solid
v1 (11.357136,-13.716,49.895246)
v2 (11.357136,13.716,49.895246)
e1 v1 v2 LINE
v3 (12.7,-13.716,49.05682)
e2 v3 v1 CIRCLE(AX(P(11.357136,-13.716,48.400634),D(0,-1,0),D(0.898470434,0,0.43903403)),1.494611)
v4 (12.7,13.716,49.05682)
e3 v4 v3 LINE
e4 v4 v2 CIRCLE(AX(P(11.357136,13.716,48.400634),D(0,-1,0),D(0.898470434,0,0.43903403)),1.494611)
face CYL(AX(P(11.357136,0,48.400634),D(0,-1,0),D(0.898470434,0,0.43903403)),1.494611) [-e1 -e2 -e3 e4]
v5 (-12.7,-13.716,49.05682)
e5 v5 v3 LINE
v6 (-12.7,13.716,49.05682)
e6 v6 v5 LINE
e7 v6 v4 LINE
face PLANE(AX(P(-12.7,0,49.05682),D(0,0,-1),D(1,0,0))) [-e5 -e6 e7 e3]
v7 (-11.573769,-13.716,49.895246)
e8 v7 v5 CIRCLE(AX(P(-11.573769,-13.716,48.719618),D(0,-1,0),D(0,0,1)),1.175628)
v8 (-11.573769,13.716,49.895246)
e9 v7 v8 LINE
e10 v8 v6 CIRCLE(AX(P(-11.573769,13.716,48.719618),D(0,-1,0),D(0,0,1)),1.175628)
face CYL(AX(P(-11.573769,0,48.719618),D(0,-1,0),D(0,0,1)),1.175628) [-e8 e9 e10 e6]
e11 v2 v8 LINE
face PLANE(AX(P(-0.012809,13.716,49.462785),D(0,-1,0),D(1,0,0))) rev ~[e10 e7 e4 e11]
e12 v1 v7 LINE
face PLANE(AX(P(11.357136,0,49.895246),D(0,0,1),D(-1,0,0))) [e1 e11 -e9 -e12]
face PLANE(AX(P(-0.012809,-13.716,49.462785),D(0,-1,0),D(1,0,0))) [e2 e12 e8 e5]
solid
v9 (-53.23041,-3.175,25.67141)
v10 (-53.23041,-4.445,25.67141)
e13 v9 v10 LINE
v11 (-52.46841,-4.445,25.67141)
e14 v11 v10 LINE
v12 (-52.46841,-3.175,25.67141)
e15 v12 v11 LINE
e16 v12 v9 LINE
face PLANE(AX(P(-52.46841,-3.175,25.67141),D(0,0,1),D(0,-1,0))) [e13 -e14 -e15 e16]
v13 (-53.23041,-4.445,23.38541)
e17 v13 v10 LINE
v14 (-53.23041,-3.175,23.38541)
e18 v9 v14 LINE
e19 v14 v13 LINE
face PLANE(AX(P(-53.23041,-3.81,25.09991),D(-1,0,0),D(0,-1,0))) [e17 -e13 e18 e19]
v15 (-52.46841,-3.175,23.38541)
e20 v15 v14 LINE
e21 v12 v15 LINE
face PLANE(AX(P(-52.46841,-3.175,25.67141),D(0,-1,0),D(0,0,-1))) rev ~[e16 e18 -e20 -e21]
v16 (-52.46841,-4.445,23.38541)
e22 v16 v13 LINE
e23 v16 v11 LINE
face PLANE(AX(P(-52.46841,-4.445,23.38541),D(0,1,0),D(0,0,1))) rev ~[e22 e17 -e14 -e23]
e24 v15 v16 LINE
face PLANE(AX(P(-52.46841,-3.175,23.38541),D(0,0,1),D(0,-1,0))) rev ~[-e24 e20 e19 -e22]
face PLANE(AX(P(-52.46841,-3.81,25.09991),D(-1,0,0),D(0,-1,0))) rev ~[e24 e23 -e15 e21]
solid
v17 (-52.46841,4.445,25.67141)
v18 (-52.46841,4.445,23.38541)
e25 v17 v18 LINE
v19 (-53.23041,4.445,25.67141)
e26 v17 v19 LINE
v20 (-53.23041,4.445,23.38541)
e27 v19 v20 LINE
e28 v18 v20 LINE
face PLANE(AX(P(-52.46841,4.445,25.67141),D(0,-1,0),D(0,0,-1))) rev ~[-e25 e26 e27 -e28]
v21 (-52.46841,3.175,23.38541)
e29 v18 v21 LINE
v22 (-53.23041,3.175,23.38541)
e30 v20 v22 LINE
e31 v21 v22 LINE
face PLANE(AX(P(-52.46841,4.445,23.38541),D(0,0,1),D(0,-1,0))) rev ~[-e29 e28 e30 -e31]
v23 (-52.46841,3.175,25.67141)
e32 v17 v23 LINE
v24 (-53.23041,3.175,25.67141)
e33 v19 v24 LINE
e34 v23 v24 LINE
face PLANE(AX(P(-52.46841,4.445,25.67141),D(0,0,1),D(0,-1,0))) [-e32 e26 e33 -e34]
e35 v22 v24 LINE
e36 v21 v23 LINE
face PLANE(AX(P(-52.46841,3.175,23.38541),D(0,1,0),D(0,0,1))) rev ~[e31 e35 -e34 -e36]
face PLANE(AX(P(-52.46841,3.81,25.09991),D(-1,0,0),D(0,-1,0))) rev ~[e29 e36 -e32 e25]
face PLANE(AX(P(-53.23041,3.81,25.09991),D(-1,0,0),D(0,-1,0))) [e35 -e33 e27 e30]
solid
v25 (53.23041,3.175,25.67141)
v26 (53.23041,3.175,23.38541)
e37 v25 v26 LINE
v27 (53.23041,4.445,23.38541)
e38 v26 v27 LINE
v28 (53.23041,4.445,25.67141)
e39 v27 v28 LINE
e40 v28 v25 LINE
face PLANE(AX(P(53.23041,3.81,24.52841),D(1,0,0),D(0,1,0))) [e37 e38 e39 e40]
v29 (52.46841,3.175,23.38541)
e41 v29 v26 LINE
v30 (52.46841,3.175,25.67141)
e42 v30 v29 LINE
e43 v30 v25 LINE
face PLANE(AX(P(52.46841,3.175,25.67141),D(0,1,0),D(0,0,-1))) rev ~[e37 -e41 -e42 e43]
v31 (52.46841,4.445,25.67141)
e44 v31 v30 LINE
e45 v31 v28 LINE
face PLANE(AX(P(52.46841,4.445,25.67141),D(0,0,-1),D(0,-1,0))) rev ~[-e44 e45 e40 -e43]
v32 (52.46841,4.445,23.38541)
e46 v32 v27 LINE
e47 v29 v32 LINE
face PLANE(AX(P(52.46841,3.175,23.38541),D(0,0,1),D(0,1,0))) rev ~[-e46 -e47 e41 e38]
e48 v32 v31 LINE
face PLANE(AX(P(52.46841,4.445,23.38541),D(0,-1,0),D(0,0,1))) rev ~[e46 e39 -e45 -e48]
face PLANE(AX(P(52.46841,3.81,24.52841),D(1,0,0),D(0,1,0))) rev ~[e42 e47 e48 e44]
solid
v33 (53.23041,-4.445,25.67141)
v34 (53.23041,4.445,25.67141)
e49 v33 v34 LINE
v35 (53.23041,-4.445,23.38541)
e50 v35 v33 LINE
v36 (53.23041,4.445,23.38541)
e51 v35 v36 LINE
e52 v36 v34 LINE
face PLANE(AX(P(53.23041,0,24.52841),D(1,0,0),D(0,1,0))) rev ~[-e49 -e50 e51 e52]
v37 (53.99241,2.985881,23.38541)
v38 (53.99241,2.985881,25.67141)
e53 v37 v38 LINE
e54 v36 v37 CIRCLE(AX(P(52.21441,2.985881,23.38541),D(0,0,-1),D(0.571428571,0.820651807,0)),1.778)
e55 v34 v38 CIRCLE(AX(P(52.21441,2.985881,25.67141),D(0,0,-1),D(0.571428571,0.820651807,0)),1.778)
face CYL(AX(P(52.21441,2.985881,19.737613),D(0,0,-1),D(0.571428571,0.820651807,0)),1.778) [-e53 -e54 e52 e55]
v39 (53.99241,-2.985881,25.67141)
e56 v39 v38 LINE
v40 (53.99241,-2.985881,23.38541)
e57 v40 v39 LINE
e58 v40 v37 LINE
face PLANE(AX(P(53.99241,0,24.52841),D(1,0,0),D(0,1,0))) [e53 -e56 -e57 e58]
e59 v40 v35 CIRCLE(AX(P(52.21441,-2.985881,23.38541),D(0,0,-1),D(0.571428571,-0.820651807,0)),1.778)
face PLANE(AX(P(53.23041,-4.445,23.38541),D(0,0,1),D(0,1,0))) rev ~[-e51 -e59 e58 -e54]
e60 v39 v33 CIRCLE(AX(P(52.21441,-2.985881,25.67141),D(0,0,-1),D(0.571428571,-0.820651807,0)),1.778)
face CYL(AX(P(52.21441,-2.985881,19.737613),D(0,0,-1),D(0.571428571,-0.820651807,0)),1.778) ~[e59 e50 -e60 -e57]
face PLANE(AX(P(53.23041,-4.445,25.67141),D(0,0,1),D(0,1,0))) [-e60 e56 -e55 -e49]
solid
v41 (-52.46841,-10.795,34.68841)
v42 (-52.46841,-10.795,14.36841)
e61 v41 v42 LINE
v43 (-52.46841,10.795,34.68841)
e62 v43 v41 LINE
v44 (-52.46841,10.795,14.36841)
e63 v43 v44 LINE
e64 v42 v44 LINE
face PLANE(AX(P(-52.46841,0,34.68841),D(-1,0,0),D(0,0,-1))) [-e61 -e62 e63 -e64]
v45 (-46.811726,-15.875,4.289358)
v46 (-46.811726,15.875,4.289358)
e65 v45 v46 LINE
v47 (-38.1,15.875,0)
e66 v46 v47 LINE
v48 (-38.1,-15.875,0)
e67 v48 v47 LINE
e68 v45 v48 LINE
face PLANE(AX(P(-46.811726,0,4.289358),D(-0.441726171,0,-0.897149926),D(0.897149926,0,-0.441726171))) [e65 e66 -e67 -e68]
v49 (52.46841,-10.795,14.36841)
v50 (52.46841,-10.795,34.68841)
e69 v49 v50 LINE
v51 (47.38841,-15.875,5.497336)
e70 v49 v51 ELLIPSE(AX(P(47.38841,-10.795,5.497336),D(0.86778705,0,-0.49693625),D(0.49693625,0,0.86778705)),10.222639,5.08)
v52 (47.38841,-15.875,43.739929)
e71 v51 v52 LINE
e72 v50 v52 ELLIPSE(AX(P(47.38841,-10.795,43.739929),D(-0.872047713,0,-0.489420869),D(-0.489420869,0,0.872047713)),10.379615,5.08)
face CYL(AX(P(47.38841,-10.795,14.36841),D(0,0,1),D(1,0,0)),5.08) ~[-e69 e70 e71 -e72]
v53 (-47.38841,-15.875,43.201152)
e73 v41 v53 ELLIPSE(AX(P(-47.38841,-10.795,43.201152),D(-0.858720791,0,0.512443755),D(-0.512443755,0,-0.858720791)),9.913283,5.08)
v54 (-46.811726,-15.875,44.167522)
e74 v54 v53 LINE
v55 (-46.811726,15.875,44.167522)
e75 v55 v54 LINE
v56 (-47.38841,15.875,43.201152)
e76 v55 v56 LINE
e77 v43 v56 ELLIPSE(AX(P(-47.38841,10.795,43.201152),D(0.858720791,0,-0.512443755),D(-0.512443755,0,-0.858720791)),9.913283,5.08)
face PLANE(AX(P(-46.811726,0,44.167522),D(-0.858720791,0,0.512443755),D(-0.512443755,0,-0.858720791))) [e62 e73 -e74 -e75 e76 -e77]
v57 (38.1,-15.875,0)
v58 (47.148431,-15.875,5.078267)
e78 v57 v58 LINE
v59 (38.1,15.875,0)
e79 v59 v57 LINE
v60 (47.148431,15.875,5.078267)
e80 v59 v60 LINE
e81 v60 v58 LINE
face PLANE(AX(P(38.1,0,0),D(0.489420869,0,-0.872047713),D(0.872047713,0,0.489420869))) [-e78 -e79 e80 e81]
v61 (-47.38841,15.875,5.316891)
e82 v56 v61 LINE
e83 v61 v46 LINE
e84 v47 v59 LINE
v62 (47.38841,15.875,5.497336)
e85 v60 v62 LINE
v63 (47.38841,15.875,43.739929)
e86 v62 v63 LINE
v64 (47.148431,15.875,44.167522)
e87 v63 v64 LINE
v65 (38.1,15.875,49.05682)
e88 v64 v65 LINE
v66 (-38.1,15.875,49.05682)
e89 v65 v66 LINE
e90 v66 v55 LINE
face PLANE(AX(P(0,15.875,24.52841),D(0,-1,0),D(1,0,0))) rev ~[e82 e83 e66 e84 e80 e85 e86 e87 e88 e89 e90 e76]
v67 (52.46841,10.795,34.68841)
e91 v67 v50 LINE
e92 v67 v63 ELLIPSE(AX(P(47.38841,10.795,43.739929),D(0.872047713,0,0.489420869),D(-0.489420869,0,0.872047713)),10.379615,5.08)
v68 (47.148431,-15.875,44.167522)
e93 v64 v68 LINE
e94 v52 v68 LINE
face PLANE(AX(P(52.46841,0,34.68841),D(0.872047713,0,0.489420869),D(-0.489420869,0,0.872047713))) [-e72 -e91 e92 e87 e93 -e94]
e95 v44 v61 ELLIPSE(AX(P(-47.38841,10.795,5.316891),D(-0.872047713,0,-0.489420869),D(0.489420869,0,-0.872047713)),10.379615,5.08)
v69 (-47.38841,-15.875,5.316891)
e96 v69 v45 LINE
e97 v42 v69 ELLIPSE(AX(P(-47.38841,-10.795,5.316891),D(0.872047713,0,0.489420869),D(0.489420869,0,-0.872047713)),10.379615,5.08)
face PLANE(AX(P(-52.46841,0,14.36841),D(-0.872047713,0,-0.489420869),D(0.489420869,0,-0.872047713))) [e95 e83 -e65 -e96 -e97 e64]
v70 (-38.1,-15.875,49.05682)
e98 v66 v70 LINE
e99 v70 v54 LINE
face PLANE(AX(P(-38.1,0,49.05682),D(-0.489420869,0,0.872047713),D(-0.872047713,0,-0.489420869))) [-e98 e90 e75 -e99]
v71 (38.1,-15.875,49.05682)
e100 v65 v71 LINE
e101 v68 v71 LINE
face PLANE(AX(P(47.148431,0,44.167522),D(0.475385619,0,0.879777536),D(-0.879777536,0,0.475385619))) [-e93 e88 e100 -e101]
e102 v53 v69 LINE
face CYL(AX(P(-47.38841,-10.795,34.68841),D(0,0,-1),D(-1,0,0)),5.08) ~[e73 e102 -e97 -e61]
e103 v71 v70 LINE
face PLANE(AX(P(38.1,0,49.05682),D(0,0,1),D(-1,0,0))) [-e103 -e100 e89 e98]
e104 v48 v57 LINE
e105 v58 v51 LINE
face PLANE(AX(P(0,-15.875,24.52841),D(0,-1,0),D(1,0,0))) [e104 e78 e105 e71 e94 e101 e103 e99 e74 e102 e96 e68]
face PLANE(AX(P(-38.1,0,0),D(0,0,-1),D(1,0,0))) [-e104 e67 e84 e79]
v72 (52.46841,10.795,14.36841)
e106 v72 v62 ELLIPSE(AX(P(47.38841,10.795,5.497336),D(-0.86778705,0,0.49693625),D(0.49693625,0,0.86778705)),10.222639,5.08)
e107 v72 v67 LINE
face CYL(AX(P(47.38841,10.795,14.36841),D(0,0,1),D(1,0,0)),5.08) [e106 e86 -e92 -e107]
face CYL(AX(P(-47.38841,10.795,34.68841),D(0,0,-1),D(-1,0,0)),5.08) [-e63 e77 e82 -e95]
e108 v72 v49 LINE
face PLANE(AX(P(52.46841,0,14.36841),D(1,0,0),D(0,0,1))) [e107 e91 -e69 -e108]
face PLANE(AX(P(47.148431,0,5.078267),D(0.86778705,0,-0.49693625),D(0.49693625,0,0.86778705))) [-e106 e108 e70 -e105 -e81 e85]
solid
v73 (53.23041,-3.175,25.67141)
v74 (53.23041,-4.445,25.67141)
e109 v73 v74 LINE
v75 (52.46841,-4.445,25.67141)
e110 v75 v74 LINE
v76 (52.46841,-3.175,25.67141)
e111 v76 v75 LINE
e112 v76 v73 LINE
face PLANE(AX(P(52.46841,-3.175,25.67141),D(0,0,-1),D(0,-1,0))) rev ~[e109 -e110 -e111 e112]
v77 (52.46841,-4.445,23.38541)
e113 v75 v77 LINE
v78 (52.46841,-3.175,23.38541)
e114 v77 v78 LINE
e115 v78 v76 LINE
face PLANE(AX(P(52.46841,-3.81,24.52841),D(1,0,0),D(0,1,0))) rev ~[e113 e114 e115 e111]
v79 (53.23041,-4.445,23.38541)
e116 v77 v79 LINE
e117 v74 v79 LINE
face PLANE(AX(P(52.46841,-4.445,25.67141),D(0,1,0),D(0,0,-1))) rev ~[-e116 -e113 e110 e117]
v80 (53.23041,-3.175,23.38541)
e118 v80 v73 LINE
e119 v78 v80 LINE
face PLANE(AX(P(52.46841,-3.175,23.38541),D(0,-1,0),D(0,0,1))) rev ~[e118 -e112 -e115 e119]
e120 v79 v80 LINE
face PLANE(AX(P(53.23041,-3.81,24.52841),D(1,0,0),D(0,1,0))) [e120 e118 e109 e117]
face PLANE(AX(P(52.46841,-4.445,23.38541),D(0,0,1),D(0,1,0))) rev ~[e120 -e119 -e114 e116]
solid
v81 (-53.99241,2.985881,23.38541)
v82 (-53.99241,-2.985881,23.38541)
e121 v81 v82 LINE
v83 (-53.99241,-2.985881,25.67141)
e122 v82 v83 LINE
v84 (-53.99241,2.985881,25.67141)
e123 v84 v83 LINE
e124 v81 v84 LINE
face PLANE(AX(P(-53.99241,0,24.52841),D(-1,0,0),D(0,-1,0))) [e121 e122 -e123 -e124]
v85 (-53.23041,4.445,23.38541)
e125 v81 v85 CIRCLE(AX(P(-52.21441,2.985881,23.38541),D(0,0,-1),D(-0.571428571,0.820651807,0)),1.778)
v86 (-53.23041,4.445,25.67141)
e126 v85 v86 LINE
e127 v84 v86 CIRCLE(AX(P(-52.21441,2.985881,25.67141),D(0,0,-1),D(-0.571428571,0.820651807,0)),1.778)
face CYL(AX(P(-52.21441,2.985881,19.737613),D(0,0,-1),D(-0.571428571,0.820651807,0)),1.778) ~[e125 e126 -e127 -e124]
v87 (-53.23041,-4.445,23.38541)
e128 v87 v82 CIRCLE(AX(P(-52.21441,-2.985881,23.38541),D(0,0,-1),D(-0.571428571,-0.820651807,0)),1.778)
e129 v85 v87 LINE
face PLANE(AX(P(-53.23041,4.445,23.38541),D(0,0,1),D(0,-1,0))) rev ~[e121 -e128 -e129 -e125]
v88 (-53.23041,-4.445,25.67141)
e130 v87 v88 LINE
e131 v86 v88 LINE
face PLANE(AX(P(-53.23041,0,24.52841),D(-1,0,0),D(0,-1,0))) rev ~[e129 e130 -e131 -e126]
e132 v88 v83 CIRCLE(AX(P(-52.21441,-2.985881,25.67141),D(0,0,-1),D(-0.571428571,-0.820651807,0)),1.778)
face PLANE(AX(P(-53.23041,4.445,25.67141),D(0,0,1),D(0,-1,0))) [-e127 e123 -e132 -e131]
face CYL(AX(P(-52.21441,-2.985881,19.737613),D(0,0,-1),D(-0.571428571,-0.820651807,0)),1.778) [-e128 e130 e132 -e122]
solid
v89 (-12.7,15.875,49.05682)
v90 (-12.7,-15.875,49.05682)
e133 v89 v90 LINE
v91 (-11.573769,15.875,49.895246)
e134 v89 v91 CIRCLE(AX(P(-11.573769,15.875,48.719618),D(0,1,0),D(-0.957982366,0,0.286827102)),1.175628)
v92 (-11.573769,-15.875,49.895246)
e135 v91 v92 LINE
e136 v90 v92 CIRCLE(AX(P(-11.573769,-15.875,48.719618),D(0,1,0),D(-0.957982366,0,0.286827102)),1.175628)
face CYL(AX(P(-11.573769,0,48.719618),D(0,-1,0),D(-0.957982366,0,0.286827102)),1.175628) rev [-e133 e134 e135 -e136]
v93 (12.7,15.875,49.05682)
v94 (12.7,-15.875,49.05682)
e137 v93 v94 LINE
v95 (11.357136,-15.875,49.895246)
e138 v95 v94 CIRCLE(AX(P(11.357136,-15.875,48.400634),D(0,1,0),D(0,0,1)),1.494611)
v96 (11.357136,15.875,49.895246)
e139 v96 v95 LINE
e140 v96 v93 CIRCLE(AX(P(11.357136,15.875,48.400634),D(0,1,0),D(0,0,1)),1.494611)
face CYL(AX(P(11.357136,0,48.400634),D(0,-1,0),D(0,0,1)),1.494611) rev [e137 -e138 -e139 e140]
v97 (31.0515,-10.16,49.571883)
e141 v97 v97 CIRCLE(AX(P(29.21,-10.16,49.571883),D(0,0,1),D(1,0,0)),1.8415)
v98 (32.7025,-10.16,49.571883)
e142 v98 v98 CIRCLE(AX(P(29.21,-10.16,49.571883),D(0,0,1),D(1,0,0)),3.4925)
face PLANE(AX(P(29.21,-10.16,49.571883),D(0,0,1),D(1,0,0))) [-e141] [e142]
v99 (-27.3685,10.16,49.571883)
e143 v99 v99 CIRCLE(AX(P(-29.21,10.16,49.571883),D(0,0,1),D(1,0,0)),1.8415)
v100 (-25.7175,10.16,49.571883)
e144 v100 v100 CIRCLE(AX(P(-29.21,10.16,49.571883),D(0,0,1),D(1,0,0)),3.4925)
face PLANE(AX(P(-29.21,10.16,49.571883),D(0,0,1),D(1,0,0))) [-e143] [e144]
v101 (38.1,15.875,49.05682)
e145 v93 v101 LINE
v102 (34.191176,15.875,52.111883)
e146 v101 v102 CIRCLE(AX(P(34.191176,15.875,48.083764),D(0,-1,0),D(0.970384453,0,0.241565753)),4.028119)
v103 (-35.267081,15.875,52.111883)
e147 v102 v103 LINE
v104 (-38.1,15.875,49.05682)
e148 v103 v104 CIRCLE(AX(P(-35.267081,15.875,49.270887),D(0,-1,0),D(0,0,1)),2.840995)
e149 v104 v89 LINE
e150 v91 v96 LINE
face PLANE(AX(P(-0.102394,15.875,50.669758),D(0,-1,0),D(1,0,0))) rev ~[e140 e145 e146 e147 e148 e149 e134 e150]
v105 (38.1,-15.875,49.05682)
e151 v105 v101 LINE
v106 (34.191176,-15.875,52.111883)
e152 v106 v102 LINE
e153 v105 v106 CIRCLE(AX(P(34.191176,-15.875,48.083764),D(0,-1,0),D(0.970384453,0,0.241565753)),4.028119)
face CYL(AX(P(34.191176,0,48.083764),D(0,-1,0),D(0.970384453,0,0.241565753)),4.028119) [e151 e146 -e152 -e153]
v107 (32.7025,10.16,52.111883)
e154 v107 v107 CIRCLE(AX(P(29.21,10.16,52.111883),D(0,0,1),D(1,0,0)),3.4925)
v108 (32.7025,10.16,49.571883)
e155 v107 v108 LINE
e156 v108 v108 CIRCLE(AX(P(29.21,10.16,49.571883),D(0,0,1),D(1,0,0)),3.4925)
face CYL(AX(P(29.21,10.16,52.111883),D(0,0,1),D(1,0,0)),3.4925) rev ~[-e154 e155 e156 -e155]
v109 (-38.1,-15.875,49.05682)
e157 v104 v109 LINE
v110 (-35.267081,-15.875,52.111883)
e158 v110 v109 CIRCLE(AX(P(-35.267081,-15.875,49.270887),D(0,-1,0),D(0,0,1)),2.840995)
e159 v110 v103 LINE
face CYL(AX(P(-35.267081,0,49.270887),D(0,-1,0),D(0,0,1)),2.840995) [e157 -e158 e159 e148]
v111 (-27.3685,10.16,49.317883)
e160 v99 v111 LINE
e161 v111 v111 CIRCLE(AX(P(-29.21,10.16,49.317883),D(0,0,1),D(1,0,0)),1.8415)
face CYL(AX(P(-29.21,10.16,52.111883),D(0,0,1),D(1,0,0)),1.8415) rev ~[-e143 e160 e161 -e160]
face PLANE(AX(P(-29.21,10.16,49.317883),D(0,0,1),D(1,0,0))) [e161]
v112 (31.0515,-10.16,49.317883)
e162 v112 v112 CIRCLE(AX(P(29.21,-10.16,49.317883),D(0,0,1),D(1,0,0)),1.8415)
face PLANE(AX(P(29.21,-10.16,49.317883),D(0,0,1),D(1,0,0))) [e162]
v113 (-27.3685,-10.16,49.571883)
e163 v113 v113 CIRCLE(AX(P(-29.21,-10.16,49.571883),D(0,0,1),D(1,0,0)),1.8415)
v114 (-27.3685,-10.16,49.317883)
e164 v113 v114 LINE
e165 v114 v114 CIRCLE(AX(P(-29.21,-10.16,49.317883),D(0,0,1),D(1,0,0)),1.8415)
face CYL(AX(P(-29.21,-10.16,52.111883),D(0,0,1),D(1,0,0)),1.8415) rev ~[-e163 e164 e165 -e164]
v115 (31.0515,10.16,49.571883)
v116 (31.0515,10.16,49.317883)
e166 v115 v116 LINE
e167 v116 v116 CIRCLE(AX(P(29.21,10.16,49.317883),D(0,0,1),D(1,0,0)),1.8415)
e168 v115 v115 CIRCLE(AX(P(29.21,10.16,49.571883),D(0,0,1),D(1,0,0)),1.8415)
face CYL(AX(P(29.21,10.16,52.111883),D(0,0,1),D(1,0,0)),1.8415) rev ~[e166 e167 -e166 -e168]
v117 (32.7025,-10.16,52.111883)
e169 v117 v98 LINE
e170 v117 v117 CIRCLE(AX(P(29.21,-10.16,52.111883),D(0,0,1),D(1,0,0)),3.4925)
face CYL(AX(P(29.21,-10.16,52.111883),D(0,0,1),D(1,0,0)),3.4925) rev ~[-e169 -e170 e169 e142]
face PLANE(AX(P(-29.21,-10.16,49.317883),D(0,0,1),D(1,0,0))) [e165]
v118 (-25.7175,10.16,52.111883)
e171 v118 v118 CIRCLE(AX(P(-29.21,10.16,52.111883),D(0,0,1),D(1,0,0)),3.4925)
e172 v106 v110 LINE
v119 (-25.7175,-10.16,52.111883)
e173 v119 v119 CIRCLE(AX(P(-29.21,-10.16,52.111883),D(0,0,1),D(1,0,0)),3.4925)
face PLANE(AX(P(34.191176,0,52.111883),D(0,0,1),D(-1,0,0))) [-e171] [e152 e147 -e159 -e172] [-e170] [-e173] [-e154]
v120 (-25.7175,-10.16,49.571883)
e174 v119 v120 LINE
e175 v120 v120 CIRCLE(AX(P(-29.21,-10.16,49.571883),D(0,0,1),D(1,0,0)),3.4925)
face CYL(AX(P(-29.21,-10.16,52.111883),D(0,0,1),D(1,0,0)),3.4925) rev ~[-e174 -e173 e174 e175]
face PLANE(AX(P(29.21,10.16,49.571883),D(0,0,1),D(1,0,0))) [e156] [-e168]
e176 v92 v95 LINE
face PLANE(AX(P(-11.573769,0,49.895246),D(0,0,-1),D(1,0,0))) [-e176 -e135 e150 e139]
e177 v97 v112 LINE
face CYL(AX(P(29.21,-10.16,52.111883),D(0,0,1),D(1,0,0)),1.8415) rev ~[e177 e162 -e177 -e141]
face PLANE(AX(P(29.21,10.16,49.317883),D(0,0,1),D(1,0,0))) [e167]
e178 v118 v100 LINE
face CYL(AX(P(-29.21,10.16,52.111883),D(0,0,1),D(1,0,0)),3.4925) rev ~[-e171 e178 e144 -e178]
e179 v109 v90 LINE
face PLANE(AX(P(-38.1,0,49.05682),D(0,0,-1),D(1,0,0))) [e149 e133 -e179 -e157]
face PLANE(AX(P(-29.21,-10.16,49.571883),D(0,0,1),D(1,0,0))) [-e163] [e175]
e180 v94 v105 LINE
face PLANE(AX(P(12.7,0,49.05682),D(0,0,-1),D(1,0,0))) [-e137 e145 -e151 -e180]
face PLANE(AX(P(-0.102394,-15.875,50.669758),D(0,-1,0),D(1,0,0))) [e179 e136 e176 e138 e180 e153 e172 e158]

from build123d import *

# Parameters (mm, degrees)
F1_DEPTH       = 15.875
F2_DEPTH       = 15.875
F3_DEPTH       = 13.716
F4_R           = 3.4925
F4_R_2         = 1.8415
F5_DEPTH       = 2.54
F6_DEPTH       = 2.794
F7_W           = 1.27
F7_H           = 1.143
F8_DEPTH       = 0.762
F9_W           = 8.89
F9_H           = 2.286
F10_DEPTH      = 0.762
F11_R          = 5.08
F14_DEPTH      = 0.762
F15_W          = 8.89
F15_H          = 2.286
F16_DEPTH      = 0.762
F17_T1_DEPTH   = 9.5815945611
F17_2_T1_DEPTH = 9.5815945611


# Not quite as in the source:
# - a fillet or chamfer that OpenCascade refuses, or shapes differently, is made with other operations: its cross-section is extruded or revolved along the edge and cut away or added
# - a feature names something its author has since deleted; it is built from what else it names


with BuildPart() as f1:
    # F0 (on Front) → F1 (new body, symmetric)
    with BuildSketch(Plane.XZ):
        Polygon((-52.4684097937, 14.3684097937), (-38.1, 0), (0, 0), (38.1, 0), (52.4684097937, 14.3684097937), (52.4684097937, 34.6884097937), (38.1, 49.0568195874), (12.7, 49.0568195874), (-12.7, 49.0568195874), (-38.1, 49.0568195874), (-52.4684097937, 34.6884097937), align=None)
        Polygon((-46.8117259443, 4.2893581497), (-38.1, 0), (-52.4684097937, 14.3684097937), align=None)
        Polygon((-46.8117259443, 44.167522341), (-52.4684097937, 34.6884097937), (-38.1, 49.0568195874), align=None)
        Polygon((38.1, 49.0568195874), (52.4684097937, 34.6884097937), (47.1484308168, 44.167522341), align=None)
        Polygon((52.4684097937, 14.3684097937), (38.1, 0), (47.1484308168, 5.0782667132), align=None)
    extrude(amount=F1_DEPTH, both=True)

    # F11
    f11_edges = [f1.edges().sort_by_distance(p)[0] for p in [
        (-52.46841, -15.875, 24.52841),
        (-52.46841, 15.875, 24.52841),
        (52.46841, -15.875, 24.52841),
        (52.46841, 15.875, 24.52841),
    ]]
    fillet(f11_edges, radius=F11_R)


with BuildPart() as f2:
    # F0 (on Front) → F2 (new body, symmetric)
    with BuildSketch(Plane.XZ):
        with BuildLine():
            ThreePointArc((-35.2670811117, 52.1118827164), (-37.3502781829, 51.2026079726), (-38.1, 49.0568195874))
            Line((-38.1, 49.0568195874), (-12.7, 49.0568195874))
            ThreePointArc((-12.7, 49.0568195874), (-12.275793737, 49.6626248219), (-11.5737691522, 49.8952455819))
            Line((-11.5737691522, 49.8952455819), (11.3571360707, 49.8952455819))
            ThreePointArc((11.3571360707, 49.8952455819), (12.1486917669, 49.6684286067), (12.7, 49.0568195874))
            Line((12.7, 49.0568195874), (38.1, 49.0568195874))
            ThreePointArc((38.1, 49.0568195874), (36.6717162303, 51.25750972), (34.1911762953, 52.1118827164))
            Line((34.1911762953, 52.1118827164), (-35.2670811117, 52.1118827164))
        make_face()
    extrude(amount=F2_DEPTH, both=True)

    # F4 (on face) → F5 (cut)
    with BuildSketch(Plane.XY.offset(52.1118827164)):
        with Locations((29.21, -10.16)):
            Circle(F4_R)
        with Locations((29.21, -10.16)):
            Circle(F4_R_2, mode=Mode.SUBTRACT)
        with Locations((-29.21, -10.16)):
            Circle(F4_R)
        with Locations((-29.21, -10.16)):
            Circle(F4_R_2, mode=Mode.SUBTRACT)
        with Locations((-29.21, 10.16)):
            Circle(F4_R)
        with Locations((-29.21, 10.16)):
            Circle(F4_R_2, mode=Mode.SUBTRACT)
        with Locations((29.21, 10.16)):
            Circle(F4_R)
        with Locations((29.21, 10.16)):
            Circle(F4_R_2, mode=Mode.SUBTRACT)
    extrude(amount=-F5_DEPTH, mode=Mode.SUBTRACT)

    # F4 (on face) → F6 (cut)
    with BuildSketch(Plane.XY.offset(52.1118827164)):
        with Locations((-29.21, -10.16)):
            Circle(F4_R_2)
        with Locations((29.21, 10.16)):
            Circle(F4_R_2)
        with Locations((29.21, -10.16)):
            Circle(F4_R_2)
        with Locations((-29.21, 10.16)):
            Circle(F4_R_2)
    extrude(amount=-F6_DEPTH, mode=Mode.SUBTRACT)


with BuildPart() as f3:
    # F0 (on Front) → F3 (new body, symmetric)
    with BuildSketch(Plane.XZ):
        with BuildLine():
            ThreePointArc((-11.5737691522, 49.8952455819), (-12.275793737, 49.6626248219), (-12.7, 49.0568195874))
            Line((-12.7, 49.0568195874), (12.7, 49.0568195874))
            ThreePointArc((12.7, 49.0568195874), (12.1486917669, 49.6684286067), (11.3571360707, 49.8952455819))
            Line((11.3571360707, 49.8952455819), (-11.5737691522, 49.8952455819))
        make_face()
    extrude(amount=F3_DEPTH, both=True)


with BuildPart() as f8:
    # F7 (on face) → F8 (new body)
    with BuildSketch(Plane(origin=(-52.4684097937, 0, 0), x_dir=(0, -1, 0), z_dir=(-1, 0, 0))):
        with Locations((-3.81, 25.0999097937)):
            Rectangle(F7_W, F7_H)
        with Locations((-3.81, 23.9569097937)):
            Rectangle(F7_W, F7_H)
    extrude(amount=F8_DEPTH)


with BuildPart() as f8b:
    # F7 (on face) → F8, piece 2 (new body)
    with BuildSketch(Plane(origin=(-52.4684097937, 0, 0), x_dir=(0, -1, 0), z_dir=(-1, 0, 0))):
        with Locations((3.81, 25.0999097937)):
            Rectangle(F7_W, F7_H)
        with Locations((3.81, 23.9569097937)):
            Rectangle(F7_W, F7_H)
    extrude(amount=F8_DEPTH)


with BuildPart() as f10:
    # F9 (on face) → F10 (new body)
    with BuildSketch(Plane(origin=(-53.2304097937, 0, 0), x_dir=(0, -1, 0), z_dir=(-1, 0, 0))):
        with Locations((0, 24.5284097937)):
            Rectangle(F9_W, F9_H)
    extrude(amount=F10_DEPTH)

    # F17: fillet of radius 1.778 on 2 edges, made by hand

    # F17_s2 → F17_t1 (cut)
    with BuildSketch(Plane.XY.offset(19.7376125131)):
        with BuildLine():
            ThreePointArc((-53.2304097937, 4.445), (-53.7904383468, 3.8089351565), (-53.9924097937, 2.9858810878))
            Line((-53.9924097937, 2.9858810878), (-53.9924097937, 4.445))
            Line((-53.9924097937, 4.445), (-53.2304097937, 4.445))
        make_face()
        with BuildLine():
            ThreePointArc((-53.2304097937, -4.445), (-53.7904383468, -3.8089351565), (-53.9924097937, -2.9858810878))
            Line((-53.9924097937, -2.9858810878), (-53.9924097937, -4.445))
            Line((-53.9924097937, -4.445), (-53.2304097937, -4.445))
        make_face()
    extrude(amount=F17_T1_DEPTH, mode=Mode.SUBTRACT)


with BuildPart() as f14:
    # F13 (on face) → F14 (new body)
    with BuildSketch(Plane.YZ.offset(52.4684097937)):
        Polygon((-3.175, 23.3854097937), (-3.175, 24.5284097937), (-3.175, 25.6714097937), (-4.445, 25.6714097937), (-4.445, 23.3854097937), align=None)
    extrude(amount=F14_DEPTH)


with BuildPart() as f14b:
    # F13 (on face) → F14, piece 2 (new body)
    with BuildSketch(Plane.YZ.offset(52.4684097937)):
        Polygon((3.175, 25.6714097937), (3.175, 24.5284097937), (3.175, 23.3854097937), (4.445, 23.3854097937), (4.445, 25.6714097937), align=None)
    extrude(amount=F14_DEPTH)


with BuildPart() as f16:
    # F15 (on face) → F16 (new body)
    with BuildSketch(Plane.YZ.offset(53.2304097937)):
        with Locations((0, 24.5284097937)):
            Rectangle(F15_W, F15_H)
    extrude(amount=F16_DEPTH)

    # F17#2: fillet of radius 1.778 on 2 edges, made by hand

    # F17_2_s2 → F17_2_t1 (cut)
    with BuildSketch(Plane.XY.offset(19.7376125131)):
        with BuildLine():
            ThreePointArc((53.2304097937, -4.445), (53.7904383468, -3.8089351565), (53.9924097937, -2.9858810878))
            Line((53.9924097937, -2.9858810878), (53.9924097937, -4.445))
            Line((53.9924097937, -4.445), (53.2304097937, -4.445))
        make_face()
        with BuildLine():
            ThreePointArc((53.2304097937, 4.445), (53.7904383468, 3.8089351565), (53.9924097937, 2.9858810878))
            Line((53.9924097937, 2.9858810878), (53.9924097937, 4.445))
            Line((53.9924097937, 4.445), (53.2304097937, 4.445))
        make_face()
    extrude(amount=F17_2_T1_DEPTH, mode=Mode.SUBTRACT)


solid = Compound([f1.part, f2.part, f3.part, f8.part, f8b.part, f10.part, f14.part, f14b.part, f16.part])
